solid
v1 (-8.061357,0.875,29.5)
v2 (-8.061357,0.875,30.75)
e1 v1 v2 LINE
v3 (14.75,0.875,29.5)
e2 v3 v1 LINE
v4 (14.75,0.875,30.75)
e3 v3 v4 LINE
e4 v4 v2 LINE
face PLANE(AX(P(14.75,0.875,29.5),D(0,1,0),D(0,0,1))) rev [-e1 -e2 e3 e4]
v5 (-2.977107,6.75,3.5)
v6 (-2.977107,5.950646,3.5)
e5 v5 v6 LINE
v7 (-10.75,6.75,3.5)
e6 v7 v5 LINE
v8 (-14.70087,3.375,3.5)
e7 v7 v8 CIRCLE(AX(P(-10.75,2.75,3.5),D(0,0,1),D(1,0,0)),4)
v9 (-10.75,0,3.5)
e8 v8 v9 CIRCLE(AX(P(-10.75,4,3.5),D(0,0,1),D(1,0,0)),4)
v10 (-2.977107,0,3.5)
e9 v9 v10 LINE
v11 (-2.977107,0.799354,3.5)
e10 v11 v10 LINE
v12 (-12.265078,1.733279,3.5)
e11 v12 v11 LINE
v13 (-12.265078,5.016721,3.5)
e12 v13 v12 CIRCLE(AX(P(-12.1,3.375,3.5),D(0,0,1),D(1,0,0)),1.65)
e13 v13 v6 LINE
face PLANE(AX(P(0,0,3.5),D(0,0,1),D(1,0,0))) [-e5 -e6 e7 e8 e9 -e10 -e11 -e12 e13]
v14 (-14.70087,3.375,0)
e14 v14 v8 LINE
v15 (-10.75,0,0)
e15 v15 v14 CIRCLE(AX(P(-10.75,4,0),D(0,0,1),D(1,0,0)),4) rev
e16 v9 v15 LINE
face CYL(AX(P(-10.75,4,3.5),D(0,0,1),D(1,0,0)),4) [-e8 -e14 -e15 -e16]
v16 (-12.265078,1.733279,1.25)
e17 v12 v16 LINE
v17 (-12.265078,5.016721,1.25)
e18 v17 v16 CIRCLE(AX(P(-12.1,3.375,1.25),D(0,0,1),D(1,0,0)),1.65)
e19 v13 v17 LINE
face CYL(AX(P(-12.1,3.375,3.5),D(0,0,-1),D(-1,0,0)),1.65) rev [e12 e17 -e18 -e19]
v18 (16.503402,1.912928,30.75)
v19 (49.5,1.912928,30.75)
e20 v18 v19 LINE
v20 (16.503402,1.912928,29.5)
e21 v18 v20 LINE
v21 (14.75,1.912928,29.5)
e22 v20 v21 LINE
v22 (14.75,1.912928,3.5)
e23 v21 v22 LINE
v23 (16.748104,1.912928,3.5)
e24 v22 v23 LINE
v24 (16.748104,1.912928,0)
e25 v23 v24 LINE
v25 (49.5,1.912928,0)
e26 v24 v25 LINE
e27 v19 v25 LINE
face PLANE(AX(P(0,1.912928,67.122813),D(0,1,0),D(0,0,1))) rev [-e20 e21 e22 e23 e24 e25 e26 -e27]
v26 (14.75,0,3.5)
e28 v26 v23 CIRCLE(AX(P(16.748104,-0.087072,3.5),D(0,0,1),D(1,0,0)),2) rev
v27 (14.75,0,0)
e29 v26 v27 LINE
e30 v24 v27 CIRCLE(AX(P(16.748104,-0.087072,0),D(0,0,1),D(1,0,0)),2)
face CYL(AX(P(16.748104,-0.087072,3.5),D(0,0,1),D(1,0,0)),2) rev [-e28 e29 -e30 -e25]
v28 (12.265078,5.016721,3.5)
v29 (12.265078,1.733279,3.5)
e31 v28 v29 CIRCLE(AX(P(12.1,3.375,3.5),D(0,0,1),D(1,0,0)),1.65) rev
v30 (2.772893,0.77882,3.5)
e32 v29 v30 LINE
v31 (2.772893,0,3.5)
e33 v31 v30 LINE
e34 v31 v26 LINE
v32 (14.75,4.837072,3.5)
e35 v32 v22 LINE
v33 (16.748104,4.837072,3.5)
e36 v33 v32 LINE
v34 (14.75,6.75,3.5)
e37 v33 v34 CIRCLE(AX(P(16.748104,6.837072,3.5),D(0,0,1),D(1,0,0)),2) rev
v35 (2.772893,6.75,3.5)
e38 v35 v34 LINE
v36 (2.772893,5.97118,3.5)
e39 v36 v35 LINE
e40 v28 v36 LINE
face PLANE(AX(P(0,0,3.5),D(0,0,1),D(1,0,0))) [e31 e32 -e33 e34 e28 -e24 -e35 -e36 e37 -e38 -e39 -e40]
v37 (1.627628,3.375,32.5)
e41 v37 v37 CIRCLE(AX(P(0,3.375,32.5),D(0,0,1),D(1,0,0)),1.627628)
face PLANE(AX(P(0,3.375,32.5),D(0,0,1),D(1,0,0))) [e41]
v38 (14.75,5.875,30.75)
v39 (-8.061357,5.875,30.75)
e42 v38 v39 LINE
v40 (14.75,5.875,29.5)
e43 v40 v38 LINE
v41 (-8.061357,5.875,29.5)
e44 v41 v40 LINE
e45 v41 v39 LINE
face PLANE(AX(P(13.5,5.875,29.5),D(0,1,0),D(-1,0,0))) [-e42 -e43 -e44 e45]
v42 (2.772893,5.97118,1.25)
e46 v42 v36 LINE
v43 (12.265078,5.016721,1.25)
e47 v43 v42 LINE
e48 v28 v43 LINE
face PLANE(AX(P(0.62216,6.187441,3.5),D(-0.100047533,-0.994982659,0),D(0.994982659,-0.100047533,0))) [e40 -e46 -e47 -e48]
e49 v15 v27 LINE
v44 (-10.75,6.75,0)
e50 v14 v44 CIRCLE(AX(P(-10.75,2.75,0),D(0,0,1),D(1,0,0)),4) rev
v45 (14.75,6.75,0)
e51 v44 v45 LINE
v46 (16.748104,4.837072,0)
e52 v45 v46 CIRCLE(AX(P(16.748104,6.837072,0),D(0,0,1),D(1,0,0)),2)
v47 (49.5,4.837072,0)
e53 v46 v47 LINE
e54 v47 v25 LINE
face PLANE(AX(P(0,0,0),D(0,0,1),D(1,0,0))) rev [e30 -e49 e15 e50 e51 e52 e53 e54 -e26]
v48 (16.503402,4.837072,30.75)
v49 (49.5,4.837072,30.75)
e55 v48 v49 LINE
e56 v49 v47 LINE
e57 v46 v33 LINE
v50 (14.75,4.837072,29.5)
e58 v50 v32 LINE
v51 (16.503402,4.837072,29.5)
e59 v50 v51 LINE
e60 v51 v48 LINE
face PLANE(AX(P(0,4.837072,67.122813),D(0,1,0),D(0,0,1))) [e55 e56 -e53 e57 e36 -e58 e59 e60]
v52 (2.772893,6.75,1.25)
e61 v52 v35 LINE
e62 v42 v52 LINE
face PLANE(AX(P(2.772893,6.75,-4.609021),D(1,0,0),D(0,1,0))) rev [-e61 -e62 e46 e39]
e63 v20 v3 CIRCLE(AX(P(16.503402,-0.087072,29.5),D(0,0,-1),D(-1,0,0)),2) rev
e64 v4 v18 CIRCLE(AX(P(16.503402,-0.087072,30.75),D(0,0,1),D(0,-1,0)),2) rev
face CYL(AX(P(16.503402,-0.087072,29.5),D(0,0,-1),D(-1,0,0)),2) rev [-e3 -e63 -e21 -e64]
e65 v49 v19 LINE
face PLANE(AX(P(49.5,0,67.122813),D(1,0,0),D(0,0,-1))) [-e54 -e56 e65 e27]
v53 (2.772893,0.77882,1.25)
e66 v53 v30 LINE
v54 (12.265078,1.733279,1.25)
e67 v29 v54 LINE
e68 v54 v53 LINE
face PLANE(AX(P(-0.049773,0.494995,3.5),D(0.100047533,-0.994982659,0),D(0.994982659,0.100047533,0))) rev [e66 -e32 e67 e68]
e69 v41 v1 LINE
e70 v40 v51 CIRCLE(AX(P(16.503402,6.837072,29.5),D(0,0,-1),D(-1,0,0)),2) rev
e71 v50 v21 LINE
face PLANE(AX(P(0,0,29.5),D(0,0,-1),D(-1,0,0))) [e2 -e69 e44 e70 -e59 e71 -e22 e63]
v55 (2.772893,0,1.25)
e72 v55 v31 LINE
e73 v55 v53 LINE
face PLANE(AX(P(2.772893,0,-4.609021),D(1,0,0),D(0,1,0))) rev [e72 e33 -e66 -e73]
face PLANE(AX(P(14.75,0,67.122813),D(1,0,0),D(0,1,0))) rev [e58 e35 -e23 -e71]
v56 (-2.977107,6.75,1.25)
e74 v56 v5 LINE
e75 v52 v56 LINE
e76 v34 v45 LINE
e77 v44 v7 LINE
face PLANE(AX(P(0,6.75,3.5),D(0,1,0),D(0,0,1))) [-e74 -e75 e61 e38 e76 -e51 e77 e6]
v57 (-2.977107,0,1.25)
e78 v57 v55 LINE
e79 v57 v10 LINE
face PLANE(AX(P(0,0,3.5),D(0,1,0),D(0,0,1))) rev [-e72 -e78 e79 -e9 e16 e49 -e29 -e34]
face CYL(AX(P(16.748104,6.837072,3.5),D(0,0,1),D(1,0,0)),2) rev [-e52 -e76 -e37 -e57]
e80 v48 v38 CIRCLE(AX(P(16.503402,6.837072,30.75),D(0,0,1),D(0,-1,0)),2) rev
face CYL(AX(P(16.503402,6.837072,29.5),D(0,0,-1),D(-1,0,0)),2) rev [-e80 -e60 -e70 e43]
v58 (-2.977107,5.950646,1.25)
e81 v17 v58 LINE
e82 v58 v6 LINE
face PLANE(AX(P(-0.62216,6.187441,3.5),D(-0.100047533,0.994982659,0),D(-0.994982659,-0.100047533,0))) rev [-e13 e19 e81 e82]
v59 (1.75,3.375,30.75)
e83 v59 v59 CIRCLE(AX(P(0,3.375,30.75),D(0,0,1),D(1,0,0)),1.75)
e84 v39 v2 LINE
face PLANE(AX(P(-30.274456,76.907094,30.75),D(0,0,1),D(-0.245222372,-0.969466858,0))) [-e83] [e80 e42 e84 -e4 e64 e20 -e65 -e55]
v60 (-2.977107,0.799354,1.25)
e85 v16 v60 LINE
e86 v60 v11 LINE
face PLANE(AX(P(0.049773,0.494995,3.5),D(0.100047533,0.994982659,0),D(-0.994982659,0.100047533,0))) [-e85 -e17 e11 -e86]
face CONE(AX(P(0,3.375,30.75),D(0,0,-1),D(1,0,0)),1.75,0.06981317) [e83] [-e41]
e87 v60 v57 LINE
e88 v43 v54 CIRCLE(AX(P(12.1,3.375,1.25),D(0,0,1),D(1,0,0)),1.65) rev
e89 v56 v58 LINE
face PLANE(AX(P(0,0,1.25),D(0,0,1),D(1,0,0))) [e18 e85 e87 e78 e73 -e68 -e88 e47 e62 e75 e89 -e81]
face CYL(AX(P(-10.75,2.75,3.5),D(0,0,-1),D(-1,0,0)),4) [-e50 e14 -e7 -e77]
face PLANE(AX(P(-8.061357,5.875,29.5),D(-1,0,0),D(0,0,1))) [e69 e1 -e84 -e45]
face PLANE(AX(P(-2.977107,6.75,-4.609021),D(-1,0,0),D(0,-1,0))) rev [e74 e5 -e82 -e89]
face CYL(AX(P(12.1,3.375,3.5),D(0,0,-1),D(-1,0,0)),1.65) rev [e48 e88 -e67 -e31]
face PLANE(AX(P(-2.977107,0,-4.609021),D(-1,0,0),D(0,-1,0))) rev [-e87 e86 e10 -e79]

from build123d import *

# Parameters (mm, degrees)
SKETCH1_W            = 29.5
SKETCH1_H            = 6.75
BOSS_EXTRUDE10_DEPTH = 3.5
BOSS_EXTRUDE15_DEPTH = 1.25
SKETCH1_17_W         = 34.75
SKETCH1_17_H         = 2.924143722
BOSS_EXTRUDE17_DEPTH = 30.75
BOSS_EXTRUDE18_DEPTH = 1.25
SKETCH2_9_R          = 1.75
BOSS_EXTRUDE19_DEPTH = 1.75
BOSS_EXTRUDE19_TAPER = 4
FILLET1_R            = 2
FILLET2_R            = 4
CUT_EXTRUDE1_START   = -2.25
SKETCH3_W            = 5.75
SKETCH3_H            = 1.125
CUT_EXTRUDE1_DEPTH   = 2.25


with BuildPart() as part:
    # Sketch1 → Boss-Extrude10 (new body)
    with BuildSketch(Plane.XY):
        with Locations((0, 3.375)):
            Rectangle(SKETCH1_W, SKETCH1_H)
        with BuildLine():
            Line((-12.265078429, 5.016721387), (0, 6.25))
            Line((0, 6.25), (12.265078429, 5.016721387))
            ThreePointArc((12.265078429, 5.016721387), (13.75, 3.375), (12.265078429, 1.733278613))
            Line((12.265078429, 1.733278613), (0, 0.5))
            Line((0, 0.5), (-12.265078429, 1.733278613))
            ThreePointArc((-12.265078429, 1.733278613), (-13.75, 3.375), (-12.265078429, 5.016721387))
        make_face(mode=Mode.SUBTRACT)
    extrude(amount=BOSS_EXTRUDE10_DEPTH)

    # Sketch1<16> → Boss-Extrude15 (add)
    with BuildSketch(Plane.XY):
        with BuildLine():
            ThreePointArc((-12.265078429, 5.016721387), (-13.75, 3.375), (-12.265078429, 1.733278613))
            Line((-12.265078429, 1.733278613), (0, 0.5))
            Line((0, 0.5), (12.265078429, 1.733278613))
            ThreePointArc((12.265078429, 1.733278613), (13.75, 3.375), (12.265078429, 5.016721387))
            Line((12.265078429, 5.016721387), (0, 6.25))
            Line((0, 6.25), (-12.265078429, 5.016721387))
        make_face()
    extrude(amount=BOSS_EXTRUDE15_DEPTH)

    # Sketch1<17> → Boss-Extrude17 (add)
    with BuildSketch(Plane.XY):
        with Locations((32.125, 3.375)):
            Rectangle(SKETCH1_17_W, SKETCH1_17_H)
    extrude(amount=BOSS_EXTRUDE17_DEPTH)

    # Sketch2 → Boss-Extrude18 (add)
    with BuildSketch(Plane.XY.offset(30.75)):
        Polygon((13.5, 5.875), (-8.061356684, 5.875), (-8.061356684, 0.875), (14.75, 0.875), (14.75, 5.875), align=None)
    extrude(amount=-BOSS_EXTRUDE18_DEPTH)

    # Sketch2<9> → Boss-Extrude19 (add)
    with BuildSketch(Plane.XY.offset(30.75)):
        with Locations((0, 3.375)):
            Circle(SKETCH2_9_R)
    extrude(amount=BOSS_EXTRUDE19_DEPTH, taper=BOSS_EXTRUDE19_TAPER)

    # Fillet1
    # the kernel refuses this fillet: 2 mm, written as the material it adds along each edge
    with BuildSketch(Plane(origin=(14.75, 1.912928139, 0), x_dir=(0, -1, 0), z_dir=(0, 0, 1))) as fillet1_piece_1:
        with BuildLine():
            CenterArc((2, 1.998103724), FILLET1_R, 180, 87.504786267)
            Line((0, 1.998103724), (0, 0))
            Line((0, 0), (1.912928139, 0))
        make_face()
    extrude(amount=3.5)
    with BuildSketch(Plane(origin=(14.75, 4.837071861, 0), x_dir=(1, 0, 0), z_dir=(0, 0, 1))) as fillet1_piece_2:
        with BuildLine():
            CenterArc((1.998103724, 2), FILLET1_R, 182.495213733, 87.504786267)
            Line((0, 1.912928139), (0, 0))
            Line((0, 0), (1.998103724, 0))
        make_face()
    extrude(amount=3.5)
    with BuildSketch(Plane(origin=(14.75, 1.912928139, 29.5), x_dir=(1, 0, 0), z_dir=(0, 0, 1))) as fillet1_piece_3:
        with BuildLine():
            CenterArc((1.753401761, -2), FILLET1_R, 90, 61.246917848)
            Line((0, -1.037928139), (0, 0))
            Line((0, 0), (1.753401761, 0))
        make_face()
    extrude(amount=1.25)
    with BuildSketch(Plane(origin=(14.75, 4.837071861, 29.5), x_dir=(1, 0, 0), z_dir=(0, 0, 1))) as fillet1_piece_4:
        with BuildLine():
            CenterArc((1.753401761, 2), FILLET1_R, 208.753082152, 61.246917848)
            Line((0, 1.037928139), (0, 0))
            Line((0, 0), (1.753401761, 0))
        make_face()
    extrude(amount=1.25)

    # Fillet2
    # the kernel refuses this fillet: 4 mm, written as the material it takes off along each edge
    with BuildSketch(Plane(origin=(-14.75, 6.75, -10), x_dir=(0, -1, 0), z_dir=(0, 0, 1)), Plane(origin=(-14.75, 0, -10), x_dir=(1, 0, 0), z_dir=(0, 0, 1))) as fillet2_piece_1:
        with BuildLine():
            CenterArc((FILLET2_R, FILLET2_R), FILLET2_R, 180, 90)
            Line((0, FILLET2_R), (0, 0))
            Line((0, 0), (FILLET2_R, 0))
        make_face()
    extrude(amount=23.5, mode=Mode.SUBTRACT)

    # Sketch3 → Cut-Extrude1 (cut)
    with BuildSketch(Plane.XY.offset(3.5).offset(CUT_EXTRUDE1_START)):
        with Locations((-0.102107464, 6.1875)):
            Rectangle(SKETCH3_W, SKETCH3_H)
        with Locations((-0.102107464, 0.5625)):
            Rectangle(SKETCH3_W, SKETCH3_H)
    extrude(amount=CUT_EXTRUDE1_DEPTH, mode=Mode.SUBTRACT)


solid = part.part
